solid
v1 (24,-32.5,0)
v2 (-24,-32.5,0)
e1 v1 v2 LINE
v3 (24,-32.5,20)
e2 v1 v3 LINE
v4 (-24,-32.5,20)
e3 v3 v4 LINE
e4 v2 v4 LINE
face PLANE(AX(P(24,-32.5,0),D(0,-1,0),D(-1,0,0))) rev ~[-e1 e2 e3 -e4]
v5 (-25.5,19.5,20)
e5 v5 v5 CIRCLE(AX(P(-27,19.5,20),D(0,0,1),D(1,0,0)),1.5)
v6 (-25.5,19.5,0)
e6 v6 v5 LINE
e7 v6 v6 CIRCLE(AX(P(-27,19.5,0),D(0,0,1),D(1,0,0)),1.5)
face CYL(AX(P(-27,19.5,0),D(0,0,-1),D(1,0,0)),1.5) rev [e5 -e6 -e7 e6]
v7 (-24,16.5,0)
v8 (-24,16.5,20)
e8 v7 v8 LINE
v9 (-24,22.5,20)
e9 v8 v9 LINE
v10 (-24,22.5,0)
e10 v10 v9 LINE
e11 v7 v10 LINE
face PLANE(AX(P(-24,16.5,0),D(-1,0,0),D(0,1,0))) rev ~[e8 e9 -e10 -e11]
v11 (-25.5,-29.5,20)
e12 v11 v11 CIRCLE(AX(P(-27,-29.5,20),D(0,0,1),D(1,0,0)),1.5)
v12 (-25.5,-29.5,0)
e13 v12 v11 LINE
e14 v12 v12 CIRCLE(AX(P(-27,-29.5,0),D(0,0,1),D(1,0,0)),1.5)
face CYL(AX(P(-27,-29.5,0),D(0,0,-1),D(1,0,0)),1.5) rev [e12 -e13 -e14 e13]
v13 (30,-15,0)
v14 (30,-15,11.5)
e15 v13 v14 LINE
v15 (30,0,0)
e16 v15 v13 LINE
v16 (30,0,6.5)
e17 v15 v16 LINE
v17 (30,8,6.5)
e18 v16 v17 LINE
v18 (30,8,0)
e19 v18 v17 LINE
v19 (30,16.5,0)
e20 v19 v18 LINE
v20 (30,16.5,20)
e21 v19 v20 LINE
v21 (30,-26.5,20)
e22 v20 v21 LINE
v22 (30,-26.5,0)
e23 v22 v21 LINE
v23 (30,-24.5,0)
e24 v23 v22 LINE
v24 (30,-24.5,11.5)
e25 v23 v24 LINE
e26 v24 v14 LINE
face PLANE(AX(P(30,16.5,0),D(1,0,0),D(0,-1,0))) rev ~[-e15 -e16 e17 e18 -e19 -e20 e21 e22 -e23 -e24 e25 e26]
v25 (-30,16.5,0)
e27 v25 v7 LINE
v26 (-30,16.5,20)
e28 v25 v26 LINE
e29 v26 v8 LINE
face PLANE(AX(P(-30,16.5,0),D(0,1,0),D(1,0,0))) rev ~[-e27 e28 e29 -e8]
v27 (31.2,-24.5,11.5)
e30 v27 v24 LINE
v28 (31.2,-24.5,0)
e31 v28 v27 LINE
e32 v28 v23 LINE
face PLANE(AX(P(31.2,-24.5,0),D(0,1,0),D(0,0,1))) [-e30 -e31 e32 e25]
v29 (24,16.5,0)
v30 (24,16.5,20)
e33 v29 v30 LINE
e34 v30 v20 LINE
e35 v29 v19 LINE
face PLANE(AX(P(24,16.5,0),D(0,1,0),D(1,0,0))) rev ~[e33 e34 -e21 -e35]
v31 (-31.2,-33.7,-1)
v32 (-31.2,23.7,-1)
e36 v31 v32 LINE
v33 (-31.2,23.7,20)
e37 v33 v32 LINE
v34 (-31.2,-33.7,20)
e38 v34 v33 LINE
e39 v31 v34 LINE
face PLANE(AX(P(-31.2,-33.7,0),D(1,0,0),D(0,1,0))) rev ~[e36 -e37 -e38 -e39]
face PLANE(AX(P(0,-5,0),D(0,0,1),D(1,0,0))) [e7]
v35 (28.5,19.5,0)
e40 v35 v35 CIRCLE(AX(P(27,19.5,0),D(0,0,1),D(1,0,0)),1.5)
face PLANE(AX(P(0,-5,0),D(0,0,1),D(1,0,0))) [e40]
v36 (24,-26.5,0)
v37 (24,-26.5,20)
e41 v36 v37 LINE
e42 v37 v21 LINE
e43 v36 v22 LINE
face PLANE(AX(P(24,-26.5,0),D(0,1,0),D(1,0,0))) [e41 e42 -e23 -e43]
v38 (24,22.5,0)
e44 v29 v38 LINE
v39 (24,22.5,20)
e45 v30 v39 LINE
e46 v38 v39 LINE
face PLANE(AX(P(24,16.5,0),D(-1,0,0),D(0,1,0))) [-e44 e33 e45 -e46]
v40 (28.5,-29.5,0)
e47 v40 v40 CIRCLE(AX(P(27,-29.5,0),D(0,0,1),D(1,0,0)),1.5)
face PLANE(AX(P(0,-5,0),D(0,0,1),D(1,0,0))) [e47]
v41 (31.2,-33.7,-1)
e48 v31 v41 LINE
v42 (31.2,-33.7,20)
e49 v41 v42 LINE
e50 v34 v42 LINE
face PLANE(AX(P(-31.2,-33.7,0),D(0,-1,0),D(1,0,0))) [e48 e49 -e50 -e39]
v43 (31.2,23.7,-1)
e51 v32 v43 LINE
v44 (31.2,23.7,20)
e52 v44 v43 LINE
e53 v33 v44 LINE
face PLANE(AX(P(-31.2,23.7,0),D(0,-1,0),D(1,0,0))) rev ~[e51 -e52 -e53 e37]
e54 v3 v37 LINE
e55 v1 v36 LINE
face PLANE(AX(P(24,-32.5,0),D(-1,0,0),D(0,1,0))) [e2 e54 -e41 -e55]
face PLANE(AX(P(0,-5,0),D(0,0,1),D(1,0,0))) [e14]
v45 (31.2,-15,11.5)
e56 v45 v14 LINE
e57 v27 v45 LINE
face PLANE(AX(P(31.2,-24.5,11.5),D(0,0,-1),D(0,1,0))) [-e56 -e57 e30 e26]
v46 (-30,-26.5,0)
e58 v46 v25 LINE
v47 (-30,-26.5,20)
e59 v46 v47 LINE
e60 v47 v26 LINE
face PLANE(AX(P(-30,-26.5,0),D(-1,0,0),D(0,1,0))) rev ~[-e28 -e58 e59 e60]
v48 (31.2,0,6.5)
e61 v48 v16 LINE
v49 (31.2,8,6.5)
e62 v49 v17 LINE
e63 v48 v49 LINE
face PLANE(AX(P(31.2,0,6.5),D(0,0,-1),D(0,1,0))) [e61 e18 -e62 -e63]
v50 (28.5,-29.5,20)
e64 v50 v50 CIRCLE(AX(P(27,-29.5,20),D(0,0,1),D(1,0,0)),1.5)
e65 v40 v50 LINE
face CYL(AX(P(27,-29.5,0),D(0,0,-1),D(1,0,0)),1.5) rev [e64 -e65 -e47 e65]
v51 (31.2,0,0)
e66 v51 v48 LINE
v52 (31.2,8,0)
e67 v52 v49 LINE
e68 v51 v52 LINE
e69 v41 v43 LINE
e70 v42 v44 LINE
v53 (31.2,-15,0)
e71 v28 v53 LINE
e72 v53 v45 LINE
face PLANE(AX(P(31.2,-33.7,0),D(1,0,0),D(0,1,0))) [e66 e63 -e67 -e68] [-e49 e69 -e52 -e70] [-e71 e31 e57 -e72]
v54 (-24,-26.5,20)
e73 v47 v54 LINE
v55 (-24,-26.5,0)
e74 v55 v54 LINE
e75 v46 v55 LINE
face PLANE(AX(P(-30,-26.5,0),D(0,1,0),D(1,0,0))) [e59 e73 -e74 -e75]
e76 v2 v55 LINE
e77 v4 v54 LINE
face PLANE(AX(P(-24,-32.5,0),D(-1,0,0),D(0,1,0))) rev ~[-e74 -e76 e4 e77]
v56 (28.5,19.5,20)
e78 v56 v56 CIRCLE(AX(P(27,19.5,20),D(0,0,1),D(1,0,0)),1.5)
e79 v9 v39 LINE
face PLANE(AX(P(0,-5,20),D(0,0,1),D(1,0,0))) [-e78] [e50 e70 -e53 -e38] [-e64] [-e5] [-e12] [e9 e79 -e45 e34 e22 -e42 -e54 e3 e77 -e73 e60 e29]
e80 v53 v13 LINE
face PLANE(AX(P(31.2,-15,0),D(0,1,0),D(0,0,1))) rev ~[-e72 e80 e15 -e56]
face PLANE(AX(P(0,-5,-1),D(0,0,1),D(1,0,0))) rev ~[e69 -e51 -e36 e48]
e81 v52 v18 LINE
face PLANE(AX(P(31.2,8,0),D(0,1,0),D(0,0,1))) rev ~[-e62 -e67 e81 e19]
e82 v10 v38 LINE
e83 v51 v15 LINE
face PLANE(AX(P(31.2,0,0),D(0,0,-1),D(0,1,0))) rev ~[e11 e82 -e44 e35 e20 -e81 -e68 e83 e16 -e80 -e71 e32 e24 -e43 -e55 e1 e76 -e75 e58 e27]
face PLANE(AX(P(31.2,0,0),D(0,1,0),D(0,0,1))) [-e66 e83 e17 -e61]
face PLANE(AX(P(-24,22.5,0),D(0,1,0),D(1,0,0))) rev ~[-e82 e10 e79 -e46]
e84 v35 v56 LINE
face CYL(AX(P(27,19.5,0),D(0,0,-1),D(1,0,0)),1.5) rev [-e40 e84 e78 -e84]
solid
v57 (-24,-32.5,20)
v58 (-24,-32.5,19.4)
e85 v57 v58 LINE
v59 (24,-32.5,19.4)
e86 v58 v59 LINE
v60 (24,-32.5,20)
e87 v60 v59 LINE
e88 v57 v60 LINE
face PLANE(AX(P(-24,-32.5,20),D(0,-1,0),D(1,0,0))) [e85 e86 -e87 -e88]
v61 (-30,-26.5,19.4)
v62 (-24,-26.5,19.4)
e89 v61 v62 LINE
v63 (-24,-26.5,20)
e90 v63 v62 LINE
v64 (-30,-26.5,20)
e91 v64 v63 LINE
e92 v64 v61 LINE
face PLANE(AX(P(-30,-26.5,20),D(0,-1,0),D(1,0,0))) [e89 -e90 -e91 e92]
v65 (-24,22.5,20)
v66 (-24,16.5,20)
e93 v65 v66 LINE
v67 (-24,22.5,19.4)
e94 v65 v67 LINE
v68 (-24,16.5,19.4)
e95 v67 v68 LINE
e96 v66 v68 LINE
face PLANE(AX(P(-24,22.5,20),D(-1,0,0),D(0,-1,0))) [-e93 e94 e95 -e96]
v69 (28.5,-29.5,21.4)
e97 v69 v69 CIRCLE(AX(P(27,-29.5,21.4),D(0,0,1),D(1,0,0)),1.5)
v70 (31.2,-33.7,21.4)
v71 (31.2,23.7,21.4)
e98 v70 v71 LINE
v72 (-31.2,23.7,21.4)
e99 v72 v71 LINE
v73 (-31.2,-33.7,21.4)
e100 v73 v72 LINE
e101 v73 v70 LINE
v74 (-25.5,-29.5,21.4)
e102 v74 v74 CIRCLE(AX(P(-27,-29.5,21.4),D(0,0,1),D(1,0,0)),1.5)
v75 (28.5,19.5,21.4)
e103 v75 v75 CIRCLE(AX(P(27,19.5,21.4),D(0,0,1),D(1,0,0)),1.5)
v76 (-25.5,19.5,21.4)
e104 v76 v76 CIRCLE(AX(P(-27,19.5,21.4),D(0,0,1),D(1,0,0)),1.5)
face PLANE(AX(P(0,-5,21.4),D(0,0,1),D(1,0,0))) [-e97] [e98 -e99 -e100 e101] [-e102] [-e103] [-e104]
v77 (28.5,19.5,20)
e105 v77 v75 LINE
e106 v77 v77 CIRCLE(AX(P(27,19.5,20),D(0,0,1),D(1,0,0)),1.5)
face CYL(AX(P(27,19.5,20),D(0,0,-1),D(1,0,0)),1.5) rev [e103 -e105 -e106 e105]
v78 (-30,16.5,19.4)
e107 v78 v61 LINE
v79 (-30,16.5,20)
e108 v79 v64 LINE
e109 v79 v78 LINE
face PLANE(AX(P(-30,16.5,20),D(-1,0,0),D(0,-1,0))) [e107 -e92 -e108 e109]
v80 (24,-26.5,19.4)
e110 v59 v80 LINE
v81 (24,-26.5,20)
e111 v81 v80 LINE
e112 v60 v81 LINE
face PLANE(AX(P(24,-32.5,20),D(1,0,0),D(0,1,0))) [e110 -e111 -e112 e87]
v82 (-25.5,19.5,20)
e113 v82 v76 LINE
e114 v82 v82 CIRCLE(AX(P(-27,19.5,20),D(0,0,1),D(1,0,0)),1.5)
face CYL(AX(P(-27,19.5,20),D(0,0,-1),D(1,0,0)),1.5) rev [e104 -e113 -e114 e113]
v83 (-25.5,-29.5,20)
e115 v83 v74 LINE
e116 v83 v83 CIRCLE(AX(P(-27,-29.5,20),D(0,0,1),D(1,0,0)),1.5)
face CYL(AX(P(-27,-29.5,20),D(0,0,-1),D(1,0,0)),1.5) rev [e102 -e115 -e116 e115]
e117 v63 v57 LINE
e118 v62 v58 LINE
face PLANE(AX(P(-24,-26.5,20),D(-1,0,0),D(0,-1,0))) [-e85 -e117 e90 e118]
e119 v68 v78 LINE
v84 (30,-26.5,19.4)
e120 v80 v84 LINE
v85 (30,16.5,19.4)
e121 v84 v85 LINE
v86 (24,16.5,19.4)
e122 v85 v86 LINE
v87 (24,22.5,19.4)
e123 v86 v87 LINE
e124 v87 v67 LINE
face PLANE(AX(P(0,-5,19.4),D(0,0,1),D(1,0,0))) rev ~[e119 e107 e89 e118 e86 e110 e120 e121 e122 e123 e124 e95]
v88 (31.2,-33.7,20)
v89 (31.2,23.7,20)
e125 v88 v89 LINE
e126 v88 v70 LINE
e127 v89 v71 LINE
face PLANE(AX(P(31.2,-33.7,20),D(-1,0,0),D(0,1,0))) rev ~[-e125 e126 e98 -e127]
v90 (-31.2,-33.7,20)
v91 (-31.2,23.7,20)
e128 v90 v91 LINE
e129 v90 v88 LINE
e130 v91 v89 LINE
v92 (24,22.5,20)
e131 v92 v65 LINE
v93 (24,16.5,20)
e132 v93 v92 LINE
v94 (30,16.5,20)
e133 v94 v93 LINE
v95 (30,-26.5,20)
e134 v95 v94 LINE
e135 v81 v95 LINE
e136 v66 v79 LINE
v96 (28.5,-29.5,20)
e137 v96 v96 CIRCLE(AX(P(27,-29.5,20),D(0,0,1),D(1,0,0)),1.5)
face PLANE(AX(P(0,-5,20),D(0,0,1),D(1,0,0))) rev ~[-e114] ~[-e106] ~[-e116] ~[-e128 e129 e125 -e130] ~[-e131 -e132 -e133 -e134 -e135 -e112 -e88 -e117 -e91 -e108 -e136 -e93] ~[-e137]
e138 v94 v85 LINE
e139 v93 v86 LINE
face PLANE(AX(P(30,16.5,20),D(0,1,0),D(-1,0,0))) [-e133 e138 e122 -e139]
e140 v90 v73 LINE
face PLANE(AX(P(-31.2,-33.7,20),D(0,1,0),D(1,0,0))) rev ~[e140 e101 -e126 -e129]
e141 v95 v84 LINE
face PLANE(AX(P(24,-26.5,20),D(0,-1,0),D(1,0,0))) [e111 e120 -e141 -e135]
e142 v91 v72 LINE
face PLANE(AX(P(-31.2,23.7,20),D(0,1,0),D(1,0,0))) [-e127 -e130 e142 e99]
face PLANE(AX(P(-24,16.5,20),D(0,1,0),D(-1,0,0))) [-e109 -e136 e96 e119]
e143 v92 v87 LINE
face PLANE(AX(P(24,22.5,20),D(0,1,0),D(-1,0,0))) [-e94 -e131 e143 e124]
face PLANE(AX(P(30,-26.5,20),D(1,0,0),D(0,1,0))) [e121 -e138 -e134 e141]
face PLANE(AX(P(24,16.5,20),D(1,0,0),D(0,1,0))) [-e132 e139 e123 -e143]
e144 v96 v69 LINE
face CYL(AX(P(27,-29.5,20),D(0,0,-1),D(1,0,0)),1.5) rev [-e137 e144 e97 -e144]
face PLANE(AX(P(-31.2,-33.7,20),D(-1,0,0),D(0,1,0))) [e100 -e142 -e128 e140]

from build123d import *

# Parameters (mm, degrees)
F0_W     = 62.4
F0_H     = 57.4
F0_W_2   = 6
F0_H_2   = 6
F0_R     = 1.5
F1_DEPTH = 20
F2_W     = 62.4
F2_H     = 57.4
F3_DEPTH = 1
F4_W     = 9.5
F4_H     = 11.5
F4_W_2   = 8
F4_H_2   = 6.5
F5_DEPTH = 1.2
F7_DEPTH = 0.6
F6_W     = 62.4
F6_H     = 57.4
F6_R     = 1.5
F8_DEPTH = 1.4


with BuildPart() as f1:
    # F0 (on Top) → F1 (new body)
    with BuildSketch(Plane.XY):
        with Locations((0, -5)):
            Rectangle(F0_W, F0_H)
        Polygon((-30, 16.5), (-30, 22.5), (-24, 22.5), (24, 22.5), (30, 22.5), (30, 16.5), (30, -26.5), (30, -32.5), (24, -32.5), (-24, -32.5), (-30, -32.5), (-30, -26.5), align=None, mode=Mode.SUBTRACT)
        with Locations((27, -29.5)):
            Rectangle(F0_W_2, F0_H_2)
        with Locations((27, -29.5)):
            Circle(F0_R, mode=Mode.SUBTRACT)
        with Locations((-27, 19.5)):
            Rectangle(F0_W_2, F0_H_2)
        with Locations((-27, 19.5)):
            Circle(F0_R, mode=Mode.SUBTRACT)
        with Locations((-27, -29.5)):
            Rectangle(F0_W_2, F0_H_2)
        with Locations((-27, -29.5)):
            Circle(F0_R, mode=Mode.SUBTRACT)
        with Locations((27, 19.5)):
            Rectangle(F0_W_2, F0_H_2)
        with Locations((27, 19.5)):
            Circle(F0_R, mode=Mode.SUBTRACT)
    extrude(amount=F1_DEPTH)

    # F2 (on Top) → F3 (join)
    with BuildSketch(Plane.XY):
        with Locations((0, -5)):
            Rectangle(F2_W, F2_H)
    extrude(amount=-F3_DEPTH)

    # F4 (on face) → F5 (cut, through all)
    with BuildSketch(Plane.YZ.offset(31.2)):
        with Locations((-19.75, 5.75)):
            Rectangle(F4_W, F4_H)
        with Locations((4, 3.25)):
            Rectangle(F4_W_2, F4_H_2)
    extrude(amount=-F5_DEPTH, mode=Mode.SUBTRACT)


with BuildPart() as f7:
    # F6 (on face) → F7 (new body)
    with BuildSketch(Plane.XY.offset(20)):
        Polygon((24, 22.5), (-24, 22.5), (-24, 16.5), (-30, 16.5), (-30, -26.5), (-24, -26.5), (-24, -32.5), (24, -32.5), (24, -26.5), (30, -26.5), (30, 16.5), (24, 16.5), align=None)
    extrude(amount=-F7_DEPTH)

    # F6 (on face) → F8 (join)
    with BuildSketch(Plane.XY.offset(20)):
        with Locations((0, -5)):
            Rectangle(F6_W, F6_H)
        with Locations((-27, -29.5)):
            Circle(F6_R, mode=Mode.SUBTRACT)
        with Locations((27, -29.5)):
            Circle(F6_R, mode=Mode.SUBTRACT)
        with Locations((-27, 19.5)):
            Circle(F6_R, mode=Mode.SUBTRACT)
        Polygon((-24, 16.5), (-24, 22.5), (24, 22.5), (24, 16.5), (30, 16.5), (30, -26.5), (24, -26.5), (24, -32.5), (-24, -32.5), (-24, -26.5), (-30, -26.5), (-30, 16.5), align=None, mode=Mode.SUBTRACT)
        with Locations((27, 19.5)):
            Circle(F6_R, mode=Mode.SUBTRACT)
        Polygon((24, 22.5), (-24, 22.5), (-24, 16.5), (-30, 16.5), (-30, -26.5), (-24, -26.5), (-24, -32.5), (24, -32.5), (24, -26.5), (30, -26.5), (30, 16.5), (24, 16.5), align=None)
    extrude(amount=F8_DEPTH)


solid = Compound([f1.part, f7.part])
